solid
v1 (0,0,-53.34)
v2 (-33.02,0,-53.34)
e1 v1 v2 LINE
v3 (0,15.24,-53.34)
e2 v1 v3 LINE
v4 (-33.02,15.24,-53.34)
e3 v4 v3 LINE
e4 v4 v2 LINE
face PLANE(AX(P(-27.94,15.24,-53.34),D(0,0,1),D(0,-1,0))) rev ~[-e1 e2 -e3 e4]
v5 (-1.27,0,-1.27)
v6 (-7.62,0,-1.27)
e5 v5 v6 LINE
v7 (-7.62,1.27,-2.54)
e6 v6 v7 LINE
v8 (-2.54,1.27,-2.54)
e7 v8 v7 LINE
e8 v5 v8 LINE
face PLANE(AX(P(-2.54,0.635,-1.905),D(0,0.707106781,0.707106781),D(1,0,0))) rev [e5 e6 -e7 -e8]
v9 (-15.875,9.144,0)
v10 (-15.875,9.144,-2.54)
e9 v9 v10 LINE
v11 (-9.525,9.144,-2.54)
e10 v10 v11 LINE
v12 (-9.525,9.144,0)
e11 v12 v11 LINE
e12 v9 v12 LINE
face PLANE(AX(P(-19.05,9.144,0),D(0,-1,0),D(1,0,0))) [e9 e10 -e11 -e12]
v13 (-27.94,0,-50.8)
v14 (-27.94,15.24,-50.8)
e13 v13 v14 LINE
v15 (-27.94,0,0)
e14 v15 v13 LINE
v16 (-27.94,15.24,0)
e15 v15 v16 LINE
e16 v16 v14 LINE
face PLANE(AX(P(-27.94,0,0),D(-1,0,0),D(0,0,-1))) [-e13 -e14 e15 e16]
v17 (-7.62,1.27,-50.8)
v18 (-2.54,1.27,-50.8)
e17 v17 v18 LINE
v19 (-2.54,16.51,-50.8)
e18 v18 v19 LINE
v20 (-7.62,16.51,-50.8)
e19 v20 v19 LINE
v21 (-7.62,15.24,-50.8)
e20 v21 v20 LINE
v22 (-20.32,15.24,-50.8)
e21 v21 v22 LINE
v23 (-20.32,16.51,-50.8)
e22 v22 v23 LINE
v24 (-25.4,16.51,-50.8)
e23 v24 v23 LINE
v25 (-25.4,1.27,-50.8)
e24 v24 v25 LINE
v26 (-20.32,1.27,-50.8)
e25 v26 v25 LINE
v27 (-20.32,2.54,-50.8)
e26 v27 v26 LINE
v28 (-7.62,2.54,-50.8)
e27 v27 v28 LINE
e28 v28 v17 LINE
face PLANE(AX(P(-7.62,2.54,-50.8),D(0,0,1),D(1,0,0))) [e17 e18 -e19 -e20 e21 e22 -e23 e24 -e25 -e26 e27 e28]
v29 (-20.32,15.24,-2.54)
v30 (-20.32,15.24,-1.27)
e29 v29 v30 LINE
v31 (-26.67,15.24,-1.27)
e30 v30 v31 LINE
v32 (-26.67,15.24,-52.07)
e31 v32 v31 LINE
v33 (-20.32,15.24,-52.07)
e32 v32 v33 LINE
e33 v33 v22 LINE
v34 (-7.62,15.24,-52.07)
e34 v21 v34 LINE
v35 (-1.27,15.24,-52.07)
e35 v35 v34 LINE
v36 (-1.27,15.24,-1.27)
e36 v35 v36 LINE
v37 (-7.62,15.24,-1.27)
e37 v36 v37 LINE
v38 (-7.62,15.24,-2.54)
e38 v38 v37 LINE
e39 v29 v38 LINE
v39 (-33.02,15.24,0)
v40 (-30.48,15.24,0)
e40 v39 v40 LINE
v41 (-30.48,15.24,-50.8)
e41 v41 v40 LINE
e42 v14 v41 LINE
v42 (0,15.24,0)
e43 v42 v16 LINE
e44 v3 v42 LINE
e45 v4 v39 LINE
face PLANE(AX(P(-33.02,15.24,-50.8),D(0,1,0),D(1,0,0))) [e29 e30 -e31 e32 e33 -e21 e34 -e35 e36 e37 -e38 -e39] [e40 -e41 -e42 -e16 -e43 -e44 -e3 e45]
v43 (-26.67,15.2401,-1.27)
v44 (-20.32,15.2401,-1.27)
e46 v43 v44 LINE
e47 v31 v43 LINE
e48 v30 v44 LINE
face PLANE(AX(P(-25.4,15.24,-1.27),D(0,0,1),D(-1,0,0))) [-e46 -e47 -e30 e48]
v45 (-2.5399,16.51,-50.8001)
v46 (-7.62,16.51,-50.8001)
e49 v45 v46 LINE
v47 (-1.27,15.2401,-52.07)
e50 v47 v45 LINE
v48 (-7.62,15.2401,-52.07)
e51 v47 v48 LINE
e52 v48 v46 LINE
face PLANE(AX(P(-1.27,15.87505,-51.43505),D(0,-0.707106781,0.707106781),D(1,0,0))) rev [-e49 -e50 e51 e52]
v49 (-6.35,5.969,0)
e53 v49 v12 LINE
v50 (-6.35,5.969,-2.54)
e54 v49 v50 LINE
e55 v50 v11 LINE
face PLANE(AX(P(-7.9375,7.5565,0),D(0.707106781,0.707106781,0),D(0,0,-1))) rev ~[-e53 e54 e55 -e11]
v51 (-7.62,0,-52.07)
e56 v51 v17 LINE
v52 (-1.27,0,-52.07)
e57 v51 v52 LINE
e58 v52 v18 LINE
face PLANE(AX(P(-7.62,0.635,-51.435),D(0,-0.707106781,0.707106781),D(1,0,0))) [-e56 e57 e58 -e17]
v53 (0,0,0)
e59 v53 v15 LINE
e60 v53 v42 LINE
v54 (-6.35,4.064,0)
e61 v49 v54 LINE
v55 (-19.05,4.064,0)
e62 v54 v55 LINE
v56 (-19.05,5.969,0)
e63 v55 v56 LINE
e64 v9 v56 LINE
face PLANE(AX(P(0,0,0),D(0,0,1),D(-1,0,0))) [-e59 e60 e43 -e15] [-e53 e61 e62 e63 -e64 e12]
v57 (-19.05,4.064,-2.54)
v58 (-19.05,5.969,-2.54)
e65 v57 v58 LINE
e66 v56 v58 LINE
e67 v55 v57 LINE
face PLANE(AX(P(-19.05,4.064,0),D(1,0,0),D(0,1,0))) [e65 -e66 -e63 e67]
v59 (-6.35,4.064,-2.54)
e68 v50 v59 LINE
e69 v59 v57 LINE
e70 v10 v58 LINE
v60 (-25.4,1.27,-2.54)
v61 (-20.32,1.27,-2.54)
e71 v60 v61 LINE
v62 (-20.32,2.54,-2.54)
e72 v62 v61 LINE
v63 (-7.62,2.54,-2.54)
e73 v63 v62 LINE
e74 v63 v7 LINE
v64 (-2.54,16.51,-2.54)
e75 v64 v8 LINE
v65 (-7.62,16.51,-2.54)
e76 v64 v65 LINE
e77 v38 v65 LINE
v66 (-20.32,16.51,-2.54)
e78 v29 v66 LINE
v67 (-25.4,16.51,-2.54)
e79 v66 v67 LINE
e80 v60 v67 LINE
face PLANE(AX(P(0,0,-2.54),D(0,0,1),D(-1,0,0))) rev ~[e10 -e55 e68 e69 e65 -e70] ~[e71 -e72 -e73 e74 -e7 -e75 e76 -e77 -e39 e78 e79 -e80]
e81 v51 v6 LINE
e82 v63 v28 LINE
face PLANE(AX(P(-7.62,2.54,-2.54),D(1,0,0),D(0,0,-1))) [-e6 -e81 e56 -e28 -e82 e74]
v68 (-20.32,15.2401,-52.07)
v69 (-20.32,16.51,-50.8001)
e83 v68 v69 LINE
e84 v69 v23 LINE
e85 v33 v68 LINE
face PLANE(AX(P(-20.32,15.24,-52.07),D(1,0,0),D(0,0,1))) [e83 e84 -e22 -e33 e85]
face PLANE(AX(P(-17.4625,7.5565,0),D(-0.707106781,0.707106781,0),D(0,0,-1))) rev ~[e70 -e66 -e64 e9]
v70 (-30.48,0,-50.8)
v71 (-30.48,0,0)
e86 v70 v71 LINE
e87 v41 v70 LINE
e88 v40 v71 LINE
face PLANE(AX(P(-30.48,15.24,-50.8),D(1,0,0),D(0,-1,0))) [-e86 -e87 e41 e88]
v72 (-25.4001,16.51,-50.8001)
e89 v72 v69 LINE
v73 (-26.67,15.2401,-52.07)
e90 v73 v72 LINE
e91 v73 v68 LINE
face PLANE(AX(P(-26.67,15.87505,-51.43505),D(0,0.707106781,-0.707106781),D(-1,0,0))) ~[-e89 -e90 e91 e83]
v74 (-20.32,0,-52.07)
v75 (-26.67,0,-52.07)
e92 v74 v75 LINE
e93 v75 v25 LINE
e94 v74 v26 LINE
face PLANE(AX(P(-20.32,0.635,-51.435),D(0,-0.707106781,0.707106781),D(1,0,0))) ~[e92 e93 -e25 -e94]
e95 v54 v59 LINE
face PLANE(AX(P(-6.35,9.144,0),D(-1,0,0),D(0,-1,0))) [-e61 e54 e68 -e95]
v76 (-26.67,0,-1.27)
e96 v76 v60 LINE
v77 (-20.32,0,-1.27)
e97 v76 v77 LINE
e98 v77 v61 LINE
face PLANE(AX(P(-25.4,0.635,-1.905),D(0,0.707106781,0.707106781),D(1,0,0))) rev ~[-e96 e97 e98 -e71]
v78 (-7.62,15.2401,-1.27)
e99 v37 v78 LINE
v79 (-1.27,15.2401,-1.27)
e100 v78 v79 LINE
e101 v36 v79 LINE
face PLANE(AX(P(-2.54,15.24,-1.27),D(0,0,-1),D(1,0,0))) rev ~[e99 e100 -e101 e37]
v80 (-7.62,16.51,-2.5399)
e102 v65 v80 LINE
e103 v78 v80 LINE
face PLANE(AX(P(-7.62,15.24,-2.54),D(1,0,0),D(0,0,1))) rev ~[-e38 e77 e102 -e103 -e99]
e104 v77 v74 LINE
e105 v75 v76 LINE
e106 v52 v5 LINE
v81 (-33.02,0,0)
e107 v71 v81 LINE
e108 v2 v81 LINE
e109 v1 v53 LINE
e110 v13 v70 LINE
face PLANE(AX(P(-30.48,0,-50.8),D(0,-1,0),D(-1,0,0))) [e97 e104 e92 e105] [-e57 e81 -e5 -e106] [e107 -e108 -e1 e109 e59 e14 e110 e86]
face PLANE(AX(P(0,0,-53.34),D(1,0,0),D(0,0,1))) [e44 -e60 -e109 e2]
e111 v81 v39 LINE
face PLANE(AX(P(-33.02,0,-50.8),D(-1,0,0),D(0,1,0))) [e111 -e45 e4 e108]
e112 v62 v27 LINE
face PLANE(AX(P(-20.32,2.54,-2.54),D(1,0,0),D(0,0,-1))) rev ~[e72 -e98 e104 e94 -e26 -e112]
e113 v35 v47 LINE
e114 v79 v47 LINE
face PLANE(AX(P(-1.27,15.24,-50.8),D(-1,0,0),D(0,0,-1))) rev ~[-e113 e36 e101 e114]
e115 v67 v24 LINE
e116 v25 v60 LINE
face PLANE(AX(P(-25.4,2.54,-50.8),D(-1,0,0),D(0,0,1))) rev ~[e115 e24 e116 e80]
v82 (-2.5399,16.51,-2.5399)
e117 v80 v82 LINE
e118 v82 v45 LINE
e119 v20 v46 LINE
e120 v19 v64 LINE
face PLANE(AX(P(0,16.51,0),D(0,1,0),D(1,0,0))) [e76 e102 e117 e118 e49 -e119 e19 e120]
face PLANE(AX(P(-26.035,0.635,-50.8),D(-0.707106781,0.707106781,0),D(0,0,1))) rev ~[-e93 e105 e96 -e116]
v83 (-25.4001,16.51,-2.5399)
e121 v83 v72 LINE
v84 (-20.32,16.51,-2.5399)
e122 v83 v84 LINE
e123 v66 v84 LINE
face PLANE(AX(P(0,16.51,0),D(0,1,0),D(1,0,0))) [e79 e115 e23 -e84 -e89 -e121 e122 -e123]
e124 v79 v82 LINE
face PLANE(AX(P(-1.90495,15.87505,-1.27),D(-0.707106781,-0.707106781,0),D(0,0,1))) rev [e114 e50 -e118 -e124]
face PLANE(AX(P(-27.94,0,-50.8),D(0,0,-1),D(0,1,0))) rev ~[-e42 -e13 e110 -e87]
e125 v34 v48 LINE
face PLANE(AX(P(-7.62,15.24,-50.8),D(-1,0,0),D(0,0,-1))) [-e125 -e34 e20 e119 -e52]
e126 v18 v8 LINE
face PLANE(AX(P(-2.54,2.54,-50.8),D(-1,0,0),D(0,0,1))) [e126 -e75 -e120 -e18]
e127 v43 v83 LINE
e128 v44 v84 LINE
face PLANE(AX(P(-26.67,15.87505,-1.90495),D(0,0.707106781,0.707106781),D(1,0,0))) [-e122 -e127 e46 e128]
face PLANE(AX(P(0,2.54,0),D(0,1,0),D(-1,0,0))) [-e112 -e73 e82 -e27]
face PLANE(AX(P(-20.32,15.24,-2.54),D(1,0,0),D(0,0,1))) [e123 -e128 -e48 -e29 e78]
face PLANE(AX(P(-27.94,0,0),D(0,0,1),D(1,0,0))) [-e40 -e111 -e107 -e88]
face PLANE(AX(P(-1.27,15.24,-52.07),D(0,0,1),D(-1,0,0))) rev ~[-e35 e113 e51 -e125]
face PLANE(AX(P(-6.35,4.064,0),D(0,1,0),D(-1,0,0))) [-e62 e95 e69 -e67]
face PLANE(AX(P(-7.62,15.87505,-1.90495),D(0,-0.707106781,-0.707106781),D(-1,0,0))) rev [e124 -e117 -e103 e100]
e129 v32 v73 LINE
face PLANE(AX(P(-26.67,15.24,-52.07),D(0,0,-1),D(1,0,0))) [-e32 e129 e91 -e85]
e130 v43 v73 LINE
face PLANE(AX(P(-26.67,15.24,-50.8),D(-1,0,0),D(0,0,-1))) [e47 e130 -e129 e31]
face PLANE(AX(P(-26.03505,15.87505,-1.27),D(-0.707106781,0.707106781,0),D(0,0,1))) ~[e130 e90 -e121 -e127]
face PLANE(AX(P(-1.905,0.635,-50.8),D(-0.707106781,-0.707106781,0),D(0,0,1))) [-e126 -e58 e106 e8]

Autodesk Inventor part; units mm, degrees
ref_plane "YZ Plane" through (0, 0, 0) normal (1, 0, 0) x (0, 1, 0)
ref_plane "XZ Plane" through (0, 0, 0) normal (0, 1, 0) x (-1, 0, 0)
ref_plane "XY Plane" through (0, 0, 0) normal (0, 0, 1) x (1, 0, 0)
sketch "Sketch1" plane through (0, 0, 0) normal (0, 1, 0) x (-1, 0, 0)
  line L0 (0, 0) -> (27.94, 0)
  line L1 (27.94, 0) -> (27.94, -53.34)
  line L2 (27.94, -53.34) -> (0, -53.34)
  line L3 (0, -53.34) -> (0, 0)
  dimension "d0" = 27.94
  dimension "d1" = 53.34
extrude "Extrusion1" add sketch "Sketch1" along normal blind 15.24
shell "Shell1" thickness 2.54 removed faces 1 at (-9.3133, 15.24, -17.78)
sketch "Sketch3" plane through (-27.94, 0, 0) normal (0, 0, 1) x (1, 0, 0)
  line L0 (21.59, 4.064) -> (8.89, 4.064)
  line L1 (8.89, 4.064) -> (8.89, 9.144)
  line L2 (8.89, 9.144) -> (21.59, 9.144)
  line L3 (21.59, 9.144) -> (21.59, 4.064)
  point P0 (27.94, 0)
  dimension "d20" = 4.064
  dimension "d21" = 12.7
  dimension "d22" = 5.08
  dimension "d23" = 6.35
extrude "Extrusion3" cut sketch "Sketch3" against normal blind 2.54
chamfer "Chamfer1" distance 3.175 angle 45 2 edges at (-19.05, 9.144, -1.27) (-6.35, 9.144, -1.27)
sketch "Sketch5" plane through (-25.4, 2.54, -2.54) normal (0, 1, 0) x (1, 0, 0)
  line L0 (0, 0) -> (5.08, 0)
  line L1 (5.08, 0) -> (5.08, 48.26)
  line L2 (5.08, 48.26) -> (0, 48.26)
  line L3 (0, 48.26) -> (0, 0)
  line L4 (0, 48.26) -> (22.86, 48.26) projected
  line L5 (22.86, 0) -> (17.78, 0)
  line L6 (17.78, 0) -> (17.78, 48.26)
  line L7 (17.78, 48.26) -> (22.86, 48.26)
  line L8 (22.86, 48.26) -> (22.86, 0)
  point P0 (25.4, -2.54)
  dimension "d29" = 5.08
  dimension "d30" = 5.08
extrude "Extrusion4" cut sketch "Sketch5" against normal blind 2.54
sketch "Sketch6" plane through (-27.94, 0, -53.34) normal (-1, 0, 0) x (0, 0, 1)
  point P0 (53.34, 0)
sketch "Sketch7" plane through (-27.94, 0, -53.34) normal (-1, 0, 0) x (0, 0, 1)
  line L0 (2.54, 15.24) -> (50.8, 15.24) projected
  line L1 (0, 0) -> (2.54, 0)
  line L2 (2.54, 0) -> (2.54, 15.24)
  line L3 (2.54, 15.24) -> (0, 15.24)
  line L4 (0, 15.24) -> (0, 0)
  point P0 (53.34, 0)
  dimension "d33" = 2.54
extrude "Extrusion5" add sketch "Sketch7" along normal blind 5.08
sketch "Sketch8" plane through (-27.94, 0, -50.8) normal (0, 0, 1) x (1, 0, 0)
  line L0 (-5.08, 15.24) -> (-2.54, 15.24)
  line L1 (-2.54, 15.24) -> (-2.54, 0)
  line L2 (-2.54, 0) -> (-5.08, 0)
  line L3 (-5.08, 0) -> (-5.08, 15.24)
  point P0 (27.94, 0)
  dimension "d36" = 2.54
extrude "Extrusion6" add sketch "Sketch8" along normal up to surface (50.8 mm away)
chamfer "Chamfer2" distance 1.27 angle 45 6 edges at (-2.54, 0, -26.67) (-5.08, 0, -2.54) (-5.08, 0, -50.8) (-22.86, 0, -2.54) (-25.4, 0, -26.67) (-22.86, 0, -50.8)
sketch "Sketch11" plane through (0, 15.24, 0) normal (0, 1, 0) x (1, 0, 0)
  line L0 (-26.67, 52.07) -> (-17.78, 52.07)
  line L1 (-20.32, 1.27) -> (-26.67, 1.27)
  line L2 (-26.67, 1.27) -> (-26.67, 52.07)
  line L3 (-25.4, 2.54) -> (-25.4, 50.8) projected
  line L4 (-2.54, 2.54) -> (-25.4, 2.54) projected
  line L5 (-25.4, 50.8) -> (-2.54, 50.8) projected
  line L6 (-1.27, 52.07) -> (-7.62, 52.07)
  line L7 (-7.62, 1.27) -> (-1.27, 1.27)
  line L8 (-1.27, 1.27) -> (-1.27, 52.07)
  line L9 (-2.54, 50.8) -> (-2.54, 2.54) projected
  line L10 (-7.62, 52.07) -> (-1.27, 52.07)
  line L11 (-1.27, 52.07) -> (-1.27, 50.8)
  line L12 (-1.27, 50.8) -> (-7.62, 50.8)
  line L13 (-7.62, 50.8) -> (-7.62, 52.07)
  line L14 (-2.54, 50.8) -> (-1.27, 50.8)
  line L15 (-1.27, 50.8) -> (-1.27, 1.27)
  line L16 (-1.27, 1.27) -> (-2.54, 1.27)
  line L17 (-2.54, 1.27) -> (-2.54, 50.8)
  line L18 (-2.54, 2.54) -> (-7.62, 2.54)
  line L19 (-7.62, 2.54) -> (-7.62, 1.27)
  line L20 (-7.62, 1.27) -> (-2.54, 1.27)
  line L21 (-2.54, 1.27) -> (-2.54, 2.54)
  line L22 (-26.67, 52.07) -> (-20.32, 52.07)
  line L23 (-20.32, 52.07) -> (-20.32, 50.8)
  line L24 (-20.32, 50.8) -> (-26.67, 50.8)
  line L25 (-26.67, 50.8) -> (-26.67, 52.07)
  line L26 (-25.4, 50.8) -> (-26.67, 50.8)
  line L27 (-26.67, 50.8) -> (-26.67, 1.27)
  line L28 (-26.67, 1.27) -> (-25.4, 1.27)
  line L29 (-25.4, 1.27) -> (-25.4, 50.8)
  line L30 (-25.4, 2.54) -> (-20.32, 2.54)
  line L31 (-20.32, 2.54) -> (-20.32, 1.27)
  line L32 (-20.32, 1.27) -> (-25.4, 1.27)
  line L33 (-25.4, 1.27) -> (-25.4, 2.54)
  point P0 (0, 0)
  dimension "d50" = 1.27
  dimension "d51" = 1.27
  dimension "d52" = 1.27
  dimension "d55" = 1.27
  dimension "d57" = 1.27
  dimension "d58" = 5.08
  dimension "d59" = 48.26
  dimension "d60" = 6.35
  dimension "d61" = 6.35
extrude "Extrusion8" add sketch "Sketch11" along normal blind 1.27 contours L0 L23 L5 L24 L2 | L24 L3 L29 L1 L2 | L13 L6 L8 L12 L5 | L29 L4 L31 L1 | L12 L8 L7 L17 L9 | L17 L7 L19 L4
chamfer "Chamfer3" distance 1.27 angle 45 6 edges at (-1.27, 16.51, -26.67) (-4.445, 16.51, -1.27) (-4.445, 16.51, -52.07) (-23.495, 16.51, -52.07) (-26.67, 16.51, -26.67) (-23.495, 16.51, -1.27)
properties part number "nano_enclosure"
